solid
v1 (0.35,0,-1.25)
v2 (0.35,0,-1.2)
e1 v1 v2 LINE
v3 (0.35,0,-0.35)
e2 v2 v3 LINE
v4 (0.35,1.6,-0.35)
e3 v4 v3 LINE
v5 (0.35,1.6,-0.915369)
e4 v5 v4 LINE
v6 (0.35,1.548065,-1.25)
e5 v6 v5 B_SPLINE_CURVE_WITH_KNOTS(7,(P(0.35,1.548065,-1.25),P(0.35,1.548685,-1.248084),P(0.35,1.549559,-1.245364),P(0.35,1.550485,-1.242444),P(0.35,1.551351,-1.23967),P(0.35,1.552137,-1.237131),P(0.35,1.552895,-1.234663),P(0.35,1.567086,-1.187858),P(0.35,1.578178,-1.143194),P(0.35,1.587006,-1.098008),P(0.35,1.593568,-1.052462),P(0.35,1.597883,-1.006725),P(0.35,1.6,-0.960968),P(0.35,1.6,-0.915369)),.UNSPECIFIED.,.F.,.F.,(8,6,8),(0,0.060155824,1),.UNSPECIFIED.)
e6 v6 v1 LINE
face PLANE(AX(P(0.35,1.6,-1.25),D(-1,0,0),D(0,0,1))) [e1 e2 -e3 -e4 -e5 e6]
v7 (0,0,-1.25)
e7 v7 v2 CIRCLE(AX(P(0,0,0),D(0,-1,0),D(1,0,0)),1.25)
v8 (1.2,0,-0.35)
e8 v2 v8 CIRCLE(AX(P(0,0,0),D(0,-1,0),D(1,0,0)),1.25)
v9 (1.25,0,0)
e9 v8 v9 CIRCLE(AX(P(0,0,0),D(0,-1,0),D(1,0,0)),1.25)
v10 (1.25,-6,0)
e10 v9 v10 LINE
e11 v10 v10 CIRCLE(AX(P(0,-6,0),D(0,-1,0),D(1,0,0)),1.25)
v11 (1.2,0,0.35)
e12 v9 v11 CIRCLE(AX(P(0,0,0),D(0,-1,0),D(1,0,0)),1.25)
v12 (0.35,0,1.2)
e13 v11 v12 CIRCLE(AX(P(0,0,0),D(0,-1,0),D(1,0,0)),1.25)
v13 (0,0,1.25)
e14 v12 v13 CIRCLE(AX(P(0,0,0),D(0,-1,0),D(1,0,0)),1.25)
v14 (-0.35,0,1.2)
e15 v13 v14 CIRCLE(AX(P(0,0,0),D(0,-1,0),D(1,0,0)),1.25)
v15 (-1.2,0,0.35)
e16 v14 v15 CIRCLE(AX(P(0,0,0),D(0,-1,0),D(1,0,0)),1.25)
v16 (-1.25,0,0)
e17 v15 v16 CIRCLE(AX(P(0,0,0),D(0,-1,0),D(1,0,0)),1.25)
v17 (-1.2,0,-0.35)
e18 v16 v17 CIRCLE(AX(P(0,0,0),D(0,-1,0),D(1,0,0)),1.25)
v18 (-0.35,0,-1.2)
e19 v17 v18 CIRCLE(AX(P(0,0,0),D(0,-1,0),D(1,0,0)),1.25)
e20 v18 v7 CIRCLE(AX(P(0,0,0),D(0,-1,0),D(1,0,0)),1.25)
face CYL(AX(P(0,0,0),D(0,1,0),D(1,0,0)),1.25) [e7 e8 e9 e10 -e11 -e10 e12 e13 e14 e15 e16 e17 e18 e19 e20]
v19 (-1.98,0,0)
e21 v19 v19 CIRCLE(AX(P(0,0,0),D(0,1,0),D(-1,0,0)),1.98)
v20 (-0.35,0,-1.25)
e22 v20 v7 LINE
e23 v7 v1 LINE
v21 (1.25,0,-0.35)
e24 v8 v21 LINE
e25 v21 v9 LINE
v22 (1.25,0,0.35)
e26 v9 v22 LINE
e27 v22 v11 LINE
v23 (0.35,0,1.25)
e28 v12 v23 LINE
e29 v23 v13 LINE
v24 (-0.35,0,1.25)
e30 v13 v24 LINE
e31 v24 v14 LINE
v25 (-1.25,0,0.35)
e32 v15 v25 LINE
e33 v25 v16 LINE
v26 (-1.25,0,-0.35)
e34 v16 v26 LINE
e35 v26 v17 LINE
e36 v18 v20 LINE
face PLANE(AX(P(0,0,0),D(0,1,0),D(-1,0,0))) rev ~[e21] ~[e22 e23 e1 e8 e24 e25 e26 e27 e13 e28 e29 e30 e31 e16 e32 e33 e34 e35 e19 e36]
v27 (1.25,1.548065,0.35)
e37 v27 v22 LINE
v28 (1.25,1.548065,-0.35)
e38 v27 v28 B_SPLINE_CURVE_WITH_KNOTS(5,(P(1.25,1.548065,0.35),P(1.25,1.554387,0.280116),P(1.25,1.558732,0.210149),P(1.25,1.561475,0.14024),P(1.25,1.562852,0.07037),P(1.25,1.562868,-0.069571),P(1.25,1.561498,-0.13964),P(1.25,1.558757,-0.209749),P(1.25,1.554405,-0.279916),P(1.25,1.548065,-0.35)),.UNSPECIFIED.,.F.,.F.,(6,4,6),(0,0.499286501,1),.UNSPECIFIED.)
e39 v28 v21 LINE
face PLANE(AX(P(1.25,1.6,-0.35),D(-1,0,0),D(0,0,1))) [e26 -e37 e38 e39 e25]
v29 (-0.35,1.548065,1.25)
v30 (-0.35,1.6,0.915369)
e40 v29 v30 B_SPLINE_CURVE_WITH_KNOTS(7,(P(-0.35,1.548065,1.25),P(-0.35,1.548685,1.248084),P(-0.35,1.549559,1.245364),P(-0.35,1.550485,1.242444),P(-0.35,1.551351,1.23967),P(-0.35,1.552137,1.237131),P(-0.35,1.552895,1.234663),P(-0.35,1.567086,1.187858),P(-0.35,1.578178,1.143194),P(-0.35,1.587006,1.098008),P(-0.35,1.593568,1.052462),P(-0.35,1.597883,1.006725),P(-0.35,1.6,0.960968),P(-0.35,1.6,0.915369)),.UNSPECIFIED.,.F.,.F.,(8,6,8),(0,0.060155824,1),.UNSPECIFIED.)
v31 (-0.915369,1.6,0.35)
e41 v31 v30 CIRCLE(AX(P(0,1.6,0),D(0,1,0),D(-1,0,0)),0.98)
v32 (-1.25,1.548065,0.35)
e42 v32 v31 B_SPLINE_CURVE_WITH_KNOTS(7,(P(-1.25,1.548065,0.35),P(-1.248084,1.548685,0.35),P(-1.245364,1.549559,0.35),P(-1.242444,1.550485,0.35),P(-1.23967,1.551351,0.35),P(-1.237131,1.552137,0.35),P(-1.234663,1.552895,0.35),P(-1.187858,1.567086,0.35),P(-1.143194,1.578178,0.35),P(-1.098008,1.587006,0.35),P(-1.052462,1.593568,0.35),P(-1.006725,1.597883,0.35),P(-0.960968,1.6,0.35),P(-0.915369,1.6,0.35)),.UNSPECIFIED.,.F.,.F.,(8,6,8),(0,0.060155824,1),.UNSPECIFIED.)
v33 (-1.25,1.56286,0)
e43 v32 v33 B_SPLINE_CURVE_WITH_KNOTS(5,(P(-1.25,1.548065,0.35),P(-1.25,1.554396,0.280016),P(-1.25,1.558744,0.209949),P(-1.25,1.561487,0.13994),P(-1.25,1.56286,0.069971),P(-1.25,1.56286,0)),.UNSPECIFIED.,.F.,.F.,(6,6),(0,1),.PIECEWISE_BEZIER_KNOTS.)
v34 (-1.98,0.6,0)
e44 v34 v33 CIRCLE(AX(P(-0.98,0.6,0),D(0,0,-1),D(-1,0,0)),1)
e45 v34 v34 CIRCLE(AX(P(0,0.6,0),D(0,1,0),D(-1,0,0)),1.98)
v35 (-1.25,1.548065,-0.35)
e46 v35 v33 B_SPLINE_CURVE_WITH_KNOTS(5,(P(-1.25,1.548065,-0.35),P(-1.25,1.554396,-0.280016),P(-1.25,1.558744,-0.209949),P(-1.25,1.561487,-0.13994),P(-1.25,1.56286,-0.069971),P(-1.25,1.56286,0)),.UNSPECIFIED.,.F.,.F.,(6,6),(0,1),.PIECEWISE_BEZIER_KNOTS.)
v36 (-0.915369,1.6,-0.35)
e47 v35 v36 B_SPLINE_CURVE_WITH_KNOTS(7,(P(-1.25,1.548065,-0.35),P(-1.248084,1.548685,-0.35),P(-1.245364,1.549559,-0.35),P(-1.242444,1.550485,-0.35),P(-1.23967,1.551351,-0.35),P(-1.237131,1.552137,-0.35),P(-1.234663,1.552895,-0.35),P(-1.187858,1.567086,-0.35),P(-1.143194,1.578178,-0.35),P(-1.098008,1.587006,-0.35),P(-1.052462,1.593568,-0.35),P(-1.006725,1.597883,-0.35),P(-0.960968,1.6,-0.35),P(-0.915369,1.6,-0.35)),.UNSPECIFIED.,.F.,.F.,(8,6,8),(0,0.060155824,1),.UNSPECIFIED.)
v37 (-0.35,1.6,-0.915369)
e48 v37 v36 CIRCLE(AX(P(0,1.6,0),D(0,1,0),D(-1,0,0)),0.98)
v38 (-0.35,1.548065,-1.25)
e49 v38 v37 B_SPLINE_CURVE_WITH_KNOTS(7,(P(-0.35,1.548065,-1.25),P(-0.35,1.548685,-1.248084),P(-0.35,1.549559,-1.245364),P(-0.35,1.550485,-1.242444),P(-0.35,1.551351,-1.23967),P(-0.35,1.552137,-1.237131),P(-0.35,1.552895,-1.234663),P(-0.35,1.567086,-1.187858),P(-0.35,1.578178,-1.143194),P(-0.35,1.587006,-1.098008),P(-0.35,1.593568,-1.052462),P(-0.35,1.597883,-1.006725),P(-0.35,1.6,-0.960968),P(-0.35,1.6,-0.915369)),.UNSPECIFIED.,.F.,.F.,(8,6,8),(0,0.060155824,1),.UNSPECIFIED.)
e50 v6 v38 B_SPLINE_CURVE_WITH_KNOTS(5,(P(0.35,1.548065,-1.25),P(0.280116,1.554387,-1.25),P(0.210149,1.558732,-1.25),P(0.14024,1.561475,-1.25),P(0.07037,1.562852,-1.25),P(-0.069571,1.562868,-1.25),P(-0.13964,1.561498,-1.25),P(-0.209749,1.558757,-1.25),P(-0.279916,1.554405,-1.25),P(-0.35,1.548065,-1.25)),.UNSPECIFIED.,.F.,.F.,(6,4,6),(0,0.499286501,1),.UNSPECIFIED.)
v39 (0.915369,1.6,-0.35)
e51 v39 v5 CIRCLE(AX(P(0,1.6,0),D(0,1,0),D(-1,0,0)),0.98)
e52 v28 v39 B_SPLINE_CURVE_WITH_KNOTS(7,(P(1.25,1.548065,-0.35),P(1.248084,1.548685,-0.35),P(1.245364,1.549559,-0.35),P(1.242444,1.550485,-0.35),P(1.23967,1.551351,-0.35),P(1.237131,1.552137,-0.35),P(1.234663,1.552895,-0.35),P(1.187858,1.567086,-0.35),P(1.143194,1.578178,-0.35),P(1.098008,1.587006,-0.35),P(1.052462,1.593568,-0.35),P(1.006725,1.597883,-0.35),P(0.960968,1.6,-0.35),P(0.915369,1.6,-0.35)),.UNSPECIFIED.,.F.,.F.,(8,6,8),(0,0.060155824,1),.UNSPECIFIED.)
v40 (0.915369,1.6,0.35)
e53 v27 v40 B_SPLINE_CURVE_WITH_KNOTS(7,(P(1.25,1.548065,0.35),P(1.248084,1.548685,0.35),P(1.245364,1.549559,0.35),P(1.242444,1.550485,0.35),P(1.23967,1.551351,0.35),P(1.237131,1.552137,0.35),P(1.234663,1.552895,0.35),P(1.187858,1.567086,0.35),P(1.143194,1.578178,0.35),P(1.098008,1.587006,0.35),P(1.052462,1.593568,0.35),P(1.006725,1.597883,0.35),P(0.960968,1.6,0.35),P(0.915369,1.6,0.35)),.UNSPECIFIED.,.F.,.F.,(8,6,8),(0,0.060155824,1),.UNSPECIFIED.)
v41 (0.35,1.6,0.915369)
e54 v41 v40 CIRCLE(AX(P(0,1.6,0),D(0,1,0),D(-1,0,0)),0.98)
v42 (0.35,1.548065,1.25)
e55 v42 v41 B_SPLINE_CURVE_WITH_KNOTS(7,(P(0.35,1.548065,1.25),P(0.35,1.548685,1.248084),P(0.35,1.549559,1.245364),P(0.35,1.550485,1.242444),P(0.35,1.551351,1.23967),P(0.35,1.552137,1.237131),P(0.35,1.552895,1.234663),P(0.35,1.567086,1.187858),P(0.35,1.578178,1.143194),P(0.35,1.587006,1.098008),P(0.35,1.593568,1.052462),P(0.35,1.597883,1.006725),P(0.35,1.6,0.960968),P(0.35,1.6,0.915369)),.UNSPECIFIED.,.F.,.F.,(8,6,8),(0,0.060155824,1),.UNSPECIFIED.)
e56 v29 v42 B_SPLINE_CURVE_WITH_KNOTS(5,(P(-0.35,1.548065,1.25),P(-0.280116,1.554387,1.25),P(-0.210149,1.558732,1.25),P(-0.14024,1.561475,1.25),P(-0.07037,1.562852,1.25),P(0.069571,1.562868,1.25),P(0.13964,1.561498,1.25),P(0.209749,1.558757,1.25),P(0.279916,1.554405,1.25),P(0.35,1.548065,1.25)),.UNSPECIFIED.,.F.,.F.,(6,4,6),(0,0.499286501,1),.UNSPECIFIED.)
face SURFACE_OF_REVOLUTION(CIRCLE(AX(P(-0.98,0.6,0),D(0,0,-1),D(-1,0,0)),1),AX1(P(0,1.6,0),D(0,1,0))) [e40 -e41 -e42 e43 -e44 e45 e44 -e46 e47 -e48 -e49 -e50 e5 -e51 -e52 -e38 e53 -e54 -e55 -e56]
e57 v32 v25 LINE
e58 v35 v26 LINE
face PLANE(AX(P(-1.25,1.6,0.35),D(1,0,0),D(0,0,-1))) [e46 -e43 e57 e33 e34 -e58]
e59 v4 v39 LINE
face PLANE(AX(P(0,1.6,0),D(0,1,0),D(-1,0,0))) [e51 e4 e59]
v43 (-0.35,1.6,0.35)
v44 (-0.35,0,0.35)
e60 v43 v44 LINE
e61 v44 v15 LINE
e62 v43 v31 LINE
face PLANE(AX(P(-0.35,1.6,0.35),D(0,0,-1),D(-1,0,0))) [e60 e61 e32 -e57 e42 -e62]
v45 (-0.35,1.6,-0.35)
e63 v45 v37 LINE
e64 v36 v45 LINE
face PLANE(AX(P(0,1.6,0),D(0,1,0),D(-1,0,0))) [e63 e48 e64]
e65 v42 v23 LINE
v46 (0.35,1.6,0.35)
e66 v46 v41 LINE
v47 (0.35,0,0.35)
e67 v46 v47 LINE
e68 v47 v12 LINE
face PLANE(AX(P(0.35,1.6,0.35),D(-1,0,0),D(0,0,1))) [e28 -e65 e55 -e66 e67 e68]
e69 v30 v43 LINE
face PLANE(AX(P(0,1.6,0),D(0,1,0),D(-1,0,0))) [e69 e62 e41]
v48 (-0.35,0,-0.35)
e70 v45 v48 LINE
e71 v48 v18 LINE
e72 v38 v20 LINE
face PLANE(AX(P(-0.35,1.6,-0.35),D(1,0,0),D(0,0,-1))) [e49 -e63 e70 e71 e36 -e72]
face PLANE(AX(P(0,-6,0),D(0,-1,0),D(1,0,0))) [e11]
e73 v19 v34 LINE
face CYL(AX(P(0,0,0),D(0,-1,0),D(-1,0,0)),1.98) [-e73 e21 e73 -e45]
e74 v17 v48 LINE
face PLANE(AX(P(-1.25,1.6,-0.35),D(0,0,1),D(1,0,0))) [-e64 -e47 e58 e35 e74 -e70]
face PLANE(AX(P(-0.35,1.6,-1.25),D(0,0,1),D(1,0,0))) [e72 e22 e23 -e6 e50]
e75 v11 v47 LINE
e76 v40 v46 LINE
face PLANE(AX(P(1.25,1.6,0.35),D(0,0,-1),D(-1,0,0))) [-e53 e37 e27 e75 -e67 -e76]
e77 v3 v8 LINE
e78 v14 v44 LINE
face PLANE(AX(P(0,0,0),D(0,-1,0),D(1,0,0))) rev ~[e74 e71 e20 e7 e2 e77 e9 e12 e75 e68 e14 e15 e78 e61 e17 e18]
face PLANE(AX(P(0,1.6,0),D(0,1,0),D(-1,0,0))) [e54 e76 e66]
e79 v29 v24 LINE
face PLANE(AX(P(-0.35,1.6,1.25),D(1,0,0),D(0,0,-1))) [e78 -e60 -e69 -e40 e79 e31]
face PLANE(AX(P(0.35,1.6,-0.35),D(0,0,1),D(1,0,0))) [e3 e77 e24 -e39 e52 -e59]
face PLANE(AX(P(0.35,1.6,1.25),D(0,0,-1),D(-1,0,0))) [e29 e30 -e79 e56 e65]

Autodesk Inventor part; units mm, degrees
ref_plane "YZ Plane" through (0, 0, 0) normal (1, 0, 0) x (0, 1, 0)
ref_plane "XZ Plane" through (0, 0, 0) normal (0, 1, 0) x (-1, 0, 0)
ref_plane "XY Plane" through (0, 0, 0) normal (0, 0, 1) x (1, 0, 0)
sketch "Sketch1" plane through (0, 0, 0) normal (0, 1, 0) x (-1, 0, 0)
  circle A0 centre (0, 0) radius 1.98
  dimension "d0" = 3.96
extrude "Extrusion1" add sketch "Sketch1" along normal blind 1.6
sketch "Sketch2" plane through (0, 1.6, 0) normal (0, 1, 0) x (1, 0, 0)
  line L0 (-0.35, -0.35) -> (-1.25, -0.35)
  line L1 (-1.25, -0.35) -> (-1.25, 0.35)
  line L2 (-1.25, 0.35) -> (-0.35, 0.35)
  line L3 (-0.35, 0.35) -> (-0.35, 1.25)
  line L4 (-0.35, 1.25) -> (0.35, 1.25)
  line L5 (0.35, 1.25) -> (0.35, 0.35)
  line L6 (0.35, 0.35) -> (1.25, 0.35)
  line L7 (1.25, 0.35) -> (1.25, -0.35)
  line L8 (1.25, -0.35) -> (0.35, -0.35)
  line L9 (0.35, -1.25) -> (-0.35, -1.25)
  line L10 (-0.35, -1.25) -> (-0.35, -0.35)
  line L11 (0.35, -0.35) -> (0.35, -1.25)
  point P0 (0, 0)
  point P1 (0, -1.25)
  point P2 (0, 1.25)
  point P3 (-1.25, 0)
  point P4 (1.25, 0)
  dimension "d3" = 2.5
  dimension "d4" = 2.5
  dimension "d5" = 1.25
  dimension "d6" = 1.25
  dimension "d7" = 0.7
  dimension "d8" = 0.7
extrude "Extrusion2" cut sketch "Sketch2" against normal blind 2
fillet "Fillet1" radius 1 1 edges at (1.98, 1.6, 0)
sketch "Sketch3" plane through (0, 0, 0) normal (0, -1, 0) x (1, 0, 0)
  circle A0 centre (0, 0) radius 1.25
  dimension "d12" = 2.5
extrude "Extrusion3" add sketch "Sketch3" along normal blind 6
thread "Thread1" size "M2.5x0.45" class "6g" standard "ANSI Metric M Profile" full length
equation "\"d4\" = d3"
equation "\"d5\" = 0.5 * d4"
equation "\"d6\" = d5"
equation "\"d8\" = d7"
properties part number "M4_8mm" material "Stainless Steel"
